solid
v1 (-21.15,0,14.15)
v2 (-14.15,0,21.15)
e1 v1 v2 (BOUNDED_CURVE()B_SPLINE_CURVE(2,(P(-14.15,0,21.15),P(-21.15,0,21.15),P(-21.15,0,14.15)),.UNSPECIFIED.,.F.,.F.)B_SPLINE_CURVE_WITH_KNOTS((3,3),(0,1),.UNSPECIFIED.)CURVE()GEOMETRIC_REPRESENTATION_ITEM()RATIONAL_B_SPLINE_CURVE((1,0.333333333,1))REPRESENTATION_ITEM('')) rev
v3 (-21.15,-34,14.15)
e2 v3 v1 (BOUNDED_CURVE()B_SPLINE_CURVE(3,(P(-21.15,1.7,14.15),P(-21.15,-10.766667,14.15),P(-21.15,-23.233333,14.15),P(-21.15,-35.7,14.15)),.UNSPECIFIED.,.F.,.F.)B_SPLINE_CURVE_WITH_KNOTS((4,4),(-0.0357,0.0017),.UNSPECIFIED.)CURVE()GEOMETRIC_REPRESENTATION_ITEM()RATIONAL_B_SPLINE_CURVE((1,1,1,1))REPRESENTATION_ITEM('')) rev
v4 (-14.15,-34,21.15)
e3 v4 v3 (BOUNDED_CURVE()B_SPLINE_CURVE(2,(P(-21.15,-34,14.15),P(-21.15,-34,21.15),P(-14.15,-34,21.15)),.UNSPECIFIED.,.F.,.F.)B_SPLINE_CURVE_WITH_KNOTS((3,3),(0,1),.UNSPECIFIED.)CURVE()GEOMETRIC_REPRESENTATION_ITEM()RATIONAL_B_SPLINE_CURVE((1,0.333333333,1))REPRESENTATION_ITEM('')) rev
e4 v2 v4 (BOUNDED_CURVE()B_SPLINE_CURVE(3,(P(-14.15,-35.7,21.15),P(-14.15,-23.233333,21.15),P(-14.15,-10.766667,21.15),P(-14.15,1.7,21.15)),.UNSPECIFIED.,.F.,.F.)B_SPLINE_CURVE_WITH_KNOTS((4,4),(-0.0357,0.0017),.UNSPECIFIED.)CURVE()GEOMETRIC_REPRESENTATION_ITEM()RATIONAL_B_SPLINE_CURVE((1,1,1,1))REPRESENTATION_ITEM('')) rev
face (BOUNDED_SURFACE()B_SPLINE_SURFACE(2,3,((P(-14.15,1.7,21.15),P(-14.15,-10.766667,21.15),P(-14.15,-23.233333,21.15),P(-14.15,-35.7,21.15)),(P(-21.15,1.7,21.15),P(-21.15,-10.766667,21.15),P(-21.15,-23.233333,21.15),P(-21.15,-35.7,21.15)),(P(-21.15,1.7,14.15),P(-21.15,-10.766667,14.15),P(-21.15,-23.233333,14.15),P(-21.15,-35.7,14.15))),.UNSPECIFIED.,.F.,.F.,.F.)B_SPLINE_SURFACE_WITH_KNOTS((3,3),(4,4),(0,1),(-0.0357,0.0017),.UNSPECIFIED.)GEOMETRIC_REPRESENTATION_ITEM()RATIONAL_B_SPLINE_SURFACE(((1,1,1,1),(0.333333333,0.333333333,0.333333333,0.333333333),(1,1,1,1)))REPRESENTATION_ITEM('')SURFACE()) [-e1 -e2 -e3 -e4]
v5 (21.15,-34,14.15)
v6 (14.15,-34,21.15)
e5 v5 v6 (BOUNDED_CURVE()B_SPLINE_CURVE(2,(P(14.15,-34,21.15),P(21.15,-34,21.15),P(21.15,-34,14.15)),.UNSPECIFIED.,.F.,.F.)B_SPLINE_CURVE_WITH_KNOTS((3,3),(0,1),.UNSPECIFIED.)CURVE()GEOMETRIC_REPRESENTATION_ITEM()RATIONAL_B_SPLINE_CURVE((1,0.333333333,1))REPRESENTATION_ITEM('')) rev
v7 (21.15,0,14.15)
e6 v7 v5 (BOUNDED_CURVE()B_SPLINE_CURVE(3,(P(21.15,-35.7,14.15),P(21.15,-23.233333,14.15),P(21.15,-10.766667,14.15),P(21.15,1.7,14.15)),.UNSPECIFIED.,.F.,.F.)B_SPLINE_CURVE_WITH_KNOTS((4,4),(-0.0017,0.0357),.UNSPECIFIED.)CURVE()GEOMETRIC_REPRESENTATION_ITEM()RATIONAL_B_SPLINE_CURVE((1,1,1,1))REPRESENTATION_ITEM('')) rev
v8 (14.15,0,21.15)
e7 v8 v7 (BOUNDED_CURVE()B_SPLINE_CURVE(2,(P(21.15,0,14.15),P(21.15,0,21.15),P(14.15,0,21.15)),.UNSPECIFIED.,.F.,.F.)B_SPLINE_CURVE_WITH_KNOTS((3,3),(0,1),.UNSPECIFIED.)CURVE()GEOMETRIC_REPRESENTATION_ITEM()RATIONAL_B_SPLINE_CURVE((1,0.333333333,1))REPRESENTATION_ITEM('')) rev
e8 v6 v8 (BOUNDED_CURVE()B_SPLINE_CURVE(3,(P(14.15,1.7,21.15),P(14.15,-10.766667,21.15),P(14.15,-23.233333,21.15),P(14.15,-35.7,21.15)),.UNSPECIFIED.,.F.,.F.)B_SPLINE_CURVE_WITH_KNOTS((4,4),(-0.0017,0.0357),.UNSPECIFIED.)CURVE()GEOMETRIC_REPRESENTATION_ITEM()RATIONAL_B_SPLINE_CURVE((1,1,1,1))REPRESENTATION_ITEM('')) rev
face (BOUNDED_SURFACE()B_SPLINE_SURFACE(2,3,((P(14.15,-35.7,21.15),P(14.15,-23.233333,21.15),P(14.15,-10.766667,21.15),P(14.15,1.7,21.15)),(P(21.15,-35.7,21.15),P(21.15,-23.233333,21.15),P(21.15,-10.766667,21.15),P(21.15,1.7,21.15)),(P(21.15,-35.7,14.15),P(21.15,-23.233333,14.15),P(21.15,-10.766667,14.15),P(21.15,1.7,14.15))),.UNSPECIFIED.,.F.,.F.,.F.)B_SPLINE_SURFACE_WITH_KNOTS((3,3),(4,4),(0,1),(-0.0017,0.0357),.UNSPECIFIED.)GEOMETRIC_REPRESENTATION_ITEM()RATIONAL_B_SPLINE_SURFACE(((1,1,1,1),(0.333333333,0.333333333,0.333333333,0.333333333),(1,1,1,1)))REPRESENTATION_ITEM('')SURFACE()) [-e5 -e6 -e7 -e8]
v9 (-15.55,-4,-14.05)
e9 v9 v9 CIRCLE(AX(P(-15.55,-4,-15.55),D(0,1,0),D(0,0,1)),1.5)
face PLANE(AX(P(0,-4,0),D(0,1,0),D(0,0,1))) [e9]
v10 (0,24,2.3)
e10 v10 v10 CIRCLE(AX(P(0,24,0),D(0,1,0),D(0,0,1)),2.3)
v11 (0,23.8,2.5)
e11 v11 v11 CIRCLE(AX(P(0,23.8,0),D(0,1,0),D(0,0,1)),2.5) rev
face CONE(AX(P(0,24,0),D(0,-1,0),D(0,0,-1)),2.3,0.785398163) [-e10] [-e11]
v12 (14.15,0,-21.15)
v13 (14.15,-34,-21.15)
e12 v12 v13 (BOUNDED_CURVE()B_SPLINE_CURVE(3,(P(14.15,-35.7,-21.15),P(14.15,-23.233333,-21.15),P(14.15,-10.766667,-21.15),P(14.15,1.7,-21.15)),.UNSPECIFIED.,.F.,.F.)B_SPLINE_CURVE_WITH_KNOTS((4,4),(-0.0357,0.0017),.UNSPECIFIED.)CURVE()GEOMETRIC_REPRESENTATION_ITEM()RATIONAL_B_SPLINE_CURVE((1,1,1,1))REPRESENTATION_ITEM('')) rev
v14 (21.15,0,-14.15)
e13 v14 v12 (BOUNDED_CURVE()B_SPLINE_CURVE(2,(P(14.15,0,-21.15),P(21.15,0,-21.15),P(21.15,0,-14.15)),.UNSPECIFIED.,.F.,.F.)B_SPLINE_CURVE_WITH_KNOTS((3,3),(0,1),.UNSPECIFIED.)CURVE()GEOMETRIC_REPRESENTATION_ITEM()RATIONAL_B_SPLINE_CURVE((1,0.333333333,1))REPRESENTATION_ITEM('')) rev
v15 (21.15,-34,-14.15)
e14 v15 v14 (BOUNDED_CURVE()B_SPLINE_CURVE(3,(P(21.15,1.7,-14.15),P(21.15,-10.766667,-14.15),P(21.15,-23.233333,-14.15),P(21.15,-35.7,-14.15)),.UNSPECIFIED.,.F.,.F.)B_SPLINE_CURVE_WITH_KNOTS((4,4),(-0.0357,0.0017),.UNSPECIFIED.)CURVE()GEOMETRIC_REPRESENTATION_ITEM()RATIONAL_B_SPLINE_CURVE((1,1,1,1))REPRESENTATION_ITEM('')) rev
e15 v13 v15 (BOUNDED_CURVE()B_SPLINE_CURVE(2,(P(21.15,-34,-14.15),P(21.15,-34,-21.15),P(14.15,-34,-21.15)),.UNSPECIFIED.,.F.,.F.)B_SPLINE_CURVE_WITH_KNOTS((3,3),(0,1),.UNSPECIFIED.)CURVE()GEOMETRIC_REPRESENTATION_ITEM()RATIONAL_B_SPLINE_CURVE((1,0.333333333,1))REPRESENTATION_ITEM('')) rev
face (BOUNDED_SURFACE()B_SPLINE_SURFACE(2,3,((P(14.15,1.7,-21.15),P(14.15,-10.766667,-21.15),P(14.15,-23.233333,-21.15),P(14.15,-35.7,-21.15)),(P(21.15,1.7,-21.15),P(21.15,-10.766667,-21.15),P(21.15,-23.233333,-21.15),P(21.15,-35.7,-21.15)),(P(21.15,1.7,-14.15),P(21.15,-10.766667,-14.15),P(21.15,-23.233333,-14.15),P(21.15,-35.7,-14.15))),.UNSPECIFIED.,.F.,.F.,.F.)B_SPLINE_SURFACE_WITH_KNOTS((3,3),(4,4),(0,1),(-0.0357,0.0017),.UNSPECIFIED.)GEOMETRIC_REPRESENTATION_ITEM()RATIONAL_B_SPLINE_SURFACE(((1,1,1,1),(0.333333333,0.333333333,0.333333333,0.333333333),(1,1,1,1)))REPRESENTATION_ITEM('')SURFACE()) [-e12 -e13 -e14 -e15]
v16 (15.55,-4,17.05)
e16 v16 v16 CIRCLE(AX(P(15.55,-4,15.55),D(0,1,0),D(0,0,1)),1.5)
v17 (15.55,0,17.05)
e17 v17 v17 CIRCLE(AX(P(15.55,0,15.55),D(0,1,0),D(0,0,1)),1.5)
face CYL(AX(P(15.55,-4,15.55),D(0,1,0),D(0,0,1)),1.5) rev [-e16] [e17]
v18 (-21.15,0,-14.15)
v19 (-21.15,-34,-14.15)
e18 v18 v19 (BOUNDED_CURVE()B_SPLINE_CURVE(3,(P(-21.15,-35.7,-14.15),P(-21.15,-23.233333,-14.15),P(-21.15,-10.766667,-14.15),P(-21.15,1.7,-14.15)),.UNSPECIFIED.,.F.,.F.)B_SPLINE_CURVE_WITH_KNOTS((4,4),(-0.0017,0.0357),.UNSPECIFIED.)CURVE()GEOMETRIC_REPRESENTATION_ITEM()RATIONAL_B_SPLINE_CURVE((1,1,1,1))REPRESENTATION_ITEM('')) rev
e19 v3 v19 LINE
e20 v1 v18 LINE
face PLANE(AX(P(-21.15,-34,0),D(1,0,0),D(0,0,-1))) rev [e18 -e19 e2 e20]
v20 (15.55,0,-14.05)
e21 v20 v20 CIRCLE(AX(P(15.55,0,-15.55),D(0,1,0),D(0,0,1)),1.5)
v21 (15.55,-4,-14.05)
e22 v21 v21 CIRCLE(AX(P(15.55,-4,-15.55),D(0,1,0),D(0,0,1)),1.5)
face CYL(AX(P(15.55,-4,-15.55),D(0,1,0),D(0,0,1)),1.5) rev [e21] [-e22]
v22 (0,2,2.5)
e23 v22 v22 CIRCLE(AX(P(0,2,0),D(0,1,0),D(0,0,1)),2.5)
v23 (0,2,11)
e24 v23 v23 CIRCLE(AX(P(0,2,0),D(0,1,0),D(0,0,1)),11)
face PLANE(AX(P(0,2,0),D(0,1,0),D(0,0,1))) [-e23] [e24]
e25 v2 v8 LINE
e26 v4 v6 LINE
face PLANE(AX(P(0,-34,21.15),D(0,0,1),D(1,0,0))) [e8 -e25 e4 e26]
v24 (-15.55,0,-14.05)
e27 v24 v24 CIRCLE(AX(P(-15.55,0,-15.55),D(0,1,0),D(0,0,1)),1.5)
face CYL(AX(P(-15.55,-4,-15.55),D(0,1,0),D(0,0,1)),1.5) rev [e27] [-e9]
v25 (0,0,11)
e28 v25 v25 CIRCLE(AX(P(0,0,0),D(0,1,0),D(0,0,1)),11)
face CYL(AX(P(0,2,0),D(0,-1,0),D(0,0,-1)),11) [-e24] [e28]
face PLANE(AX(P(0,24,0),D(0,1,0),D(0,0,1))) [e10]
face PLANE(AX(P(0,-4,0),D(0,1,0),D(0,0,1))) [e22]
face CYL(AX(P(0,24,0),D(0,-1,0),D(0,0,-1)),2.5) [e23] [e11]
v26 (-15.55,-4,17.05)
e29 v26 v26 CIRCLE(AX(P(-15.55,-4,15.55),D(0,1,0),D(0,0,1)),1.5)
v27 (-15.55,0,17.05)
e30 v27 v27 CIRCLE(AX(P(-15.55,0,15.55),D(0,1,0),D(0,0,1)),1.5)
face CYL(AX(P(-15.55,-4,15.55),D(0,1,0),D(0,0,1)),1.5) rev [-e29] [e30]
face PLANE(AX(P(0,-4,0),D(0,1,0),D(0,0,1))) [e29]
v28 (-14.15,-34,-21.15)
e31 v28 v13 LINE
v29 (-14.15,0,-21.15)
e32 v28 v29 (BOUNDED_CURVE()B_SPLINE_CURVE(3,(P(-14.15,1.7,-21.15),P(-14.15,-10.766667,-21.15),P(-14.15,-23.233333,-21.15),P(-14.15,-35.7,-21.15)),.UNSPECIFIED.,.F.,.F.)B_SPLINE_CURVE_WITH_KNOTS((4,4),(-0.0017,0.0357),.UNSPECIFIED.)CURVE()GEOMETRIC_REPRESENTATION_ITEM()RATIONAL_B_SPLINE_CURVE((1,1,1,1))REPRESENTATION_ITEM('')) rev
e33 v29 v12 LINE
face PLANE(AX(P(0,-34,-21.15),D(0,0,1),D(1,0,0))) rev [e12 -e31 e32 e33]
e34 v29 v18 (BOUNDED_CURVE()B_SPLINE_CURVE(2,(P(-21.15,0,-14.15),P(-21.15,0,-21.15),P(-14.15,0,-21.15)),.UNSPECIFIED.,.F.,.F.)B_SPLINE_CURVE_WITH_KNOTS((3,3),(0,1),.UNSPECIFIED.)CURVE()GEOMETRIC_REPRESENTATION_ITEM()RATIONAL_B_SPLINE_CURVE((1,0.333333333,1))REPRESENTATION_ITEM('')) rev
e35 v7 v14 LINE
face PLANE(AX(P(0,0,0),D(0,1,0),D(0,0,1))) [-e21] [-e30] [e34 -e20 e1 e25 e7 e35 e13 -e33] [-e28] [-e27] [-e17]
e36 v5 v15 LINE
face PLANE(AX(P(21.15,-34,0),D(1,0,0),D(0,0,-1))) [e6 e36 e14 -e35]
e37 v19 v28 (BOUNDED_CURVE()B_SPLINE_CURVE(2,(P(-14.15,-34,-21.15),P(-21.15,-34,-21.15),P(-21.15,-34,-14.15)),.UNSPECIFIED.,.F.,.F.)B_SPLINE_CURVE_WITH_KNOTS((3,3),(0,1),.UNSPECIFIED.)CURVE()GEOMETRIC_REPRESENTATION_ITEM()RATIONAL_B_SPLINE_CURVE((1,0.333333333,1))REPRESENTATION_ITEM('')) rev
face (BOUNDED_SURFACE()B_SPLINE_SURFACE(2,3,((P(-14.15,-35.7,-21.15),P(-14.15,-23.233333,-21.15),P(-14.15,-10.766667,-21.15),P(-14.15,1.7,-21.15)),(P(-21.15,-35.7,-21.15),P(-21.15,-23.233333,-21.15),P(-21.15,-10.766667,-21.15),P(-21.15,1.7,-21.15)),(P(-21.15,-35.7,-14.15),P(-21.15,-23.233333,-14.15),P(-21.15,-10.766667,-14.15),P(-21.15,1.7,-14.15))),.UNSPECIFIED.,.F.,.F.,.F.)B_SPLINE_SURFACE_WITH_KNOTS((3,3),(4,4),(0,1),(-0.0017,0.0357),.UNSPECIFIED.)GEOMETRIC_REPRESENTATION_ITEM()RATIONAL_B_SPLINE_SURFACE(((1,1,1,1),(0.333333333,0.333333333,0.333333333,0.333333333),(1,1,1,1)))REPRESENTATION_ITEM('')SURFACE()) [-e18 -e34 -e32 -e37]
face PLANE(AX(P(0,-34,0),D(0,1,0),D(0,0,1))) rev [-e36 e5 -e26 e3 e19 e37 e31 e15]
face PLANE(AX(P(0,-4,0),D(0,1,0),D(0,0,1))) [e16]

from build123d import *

# Parameters (mm, degrees)
SKETCH1_W           = 42.3
SKETCH1_H           = 42.3
BOSS_EXTRUDE1_DEPTH = 34
FILLET1_SIZE        = 7
SKETCH1_3_R         = 1.5
CUT_EXTRUDE1_DEPTH  = 4
SKETCH3_R           = 11
SKETCH3_R_2         = 2.5
BOSS_EXTRUDE2_DEPTH = 2
SKETCH3_2_R         = 2.5
BOSS_EXTRUDE3_DEPTH = 24
CHAMFER1_SIZE       = 0.2


with BuildPart() as part:
    # Sketch1 → Boss-Extrude1 (new body)
    with BuildSketch(Plane(origin=(0, 0, 0), x_dir=(1, 0, 0), z_dir=(0, 1, 0))):
        Rectangle(SKETCH1_W, SKETCH1_H)
    extrude(amount=-BOSS_EXTRUDE1_DEPTH)

    # Fillet1
    # a fillet whose section is not a circle: 7 mm, written as the material it takes off along each edge
    with BuildSketch(Plane(origin=(21.15, 17.5, 21.15), x_dir=(-1, 0, 0), z_dir=(0, -1, 0)), Plane(origin=(21.15, 17.5, -21.15), x_dir=(0, 0, 1), z_dir=(0, -1, 0)), Plane(origin=(-21.15, 17.5, -21.15), x_dir=(1, 0, 0), z_dir=(0, -1, 0))) as fillet1_piece_1:
        with BuildLine():
            Bezier((FILLET1_SIZE, 0), (0, 0), (0, FILLET1_SIZE), weights=[1, 0.333333333, 1])
            Line((0, FILLET1_SIZE), (0, 0))
            Line((0, 0), (FILLET1_SIZE, 0))
        make_face()
    extrude(amount=69, mode=Mode.SUBTRACT)
    with BuildSketch(Plane(origin=(-21.15, 17.5, 21.15), x_dir=(1, 0, 0), z_dir=(0, -1, 0))) as fillet1_piece_2:
        with BuildLine():
            Bezier((FILLET1_SIZE, 0), (0, 0), (0, -FILLET1_SIZE), weights=[1, 0.333333333, 1])
            Line((0, -FILLET1_SIZE), (0, 0))
            Line((0, 0), (FILLET1_SIZE, 0))
        make_face()
    extrude(amount=69, mode=Mode.SUBTRACT)

    # Sketch1<3> → Cut-Extrude1 (cut)
    with BuildSketch(Plane(origin=(0, 0, 0), x_dir=(1, 0, 0), z_dir=(0, 1, 0))):
        with Locations(Location((-15.55, -15.55, 0), (0, 0, 270))):
            Circle(SKETCH1_3_R)
        with Locations(Location((-15.55, 15.55, 0), (0, 0, 270))):
            Circle(SKETCH1_3_R)
        with Locations(Location((15.55, 15.55, 0), (0, 0, 270))):
            Circle(SKETCH1_3_R)
        with Locations(Location((15.55, -15.55, 0), (0, 0, 270))):
            Circle(SKETCH1_3_R)
    extrude(amount=-CUT_EXTRUDE1_DEPTH, mode=Mode.SUBTRACT)

    # Sketch3 → Boss-Extrude2 (add)
    with BuildSketch(Plane(origin=(0, 0, 0), x_dir=(1, 0, 0), z_dir=(0, 1, 0))):
        with Locations(Location((0, 0, 0), (0, 0, 270))):
            Circle(SKETCH3_R)
        with Locations(Location((0, 0, 0), (0, 0, 270))):
            Circle(SKETCH3_R_2, mode=Mode.SUBTRACT)
    extrude(amount=BOSS_EXTRUDE2_DEPTH)

    # Sketch3<2> → Boss-Extrude3 (add)
    with BuildSketch(Plane(origin=(0, 0, 0), x_dir=(1, 0, 0), z_dir=(0, 1, 0))):
        with Locations(Location((0, 0, 0), (0, 0, 270))):
            Circle(SKETCH3_2_R)
    extrude(amount=BOSS_EXTRUDE3_DEPTH)

    # Chamfer1
    chamfer1_edges = [part.edges().sort_by_distance(p)[0] for p in [
        (0, 24, -2.5),
    ]]
    chamfer(chamfer1_edges, length=CHAMFER1_SIZE)


solid = part.part
